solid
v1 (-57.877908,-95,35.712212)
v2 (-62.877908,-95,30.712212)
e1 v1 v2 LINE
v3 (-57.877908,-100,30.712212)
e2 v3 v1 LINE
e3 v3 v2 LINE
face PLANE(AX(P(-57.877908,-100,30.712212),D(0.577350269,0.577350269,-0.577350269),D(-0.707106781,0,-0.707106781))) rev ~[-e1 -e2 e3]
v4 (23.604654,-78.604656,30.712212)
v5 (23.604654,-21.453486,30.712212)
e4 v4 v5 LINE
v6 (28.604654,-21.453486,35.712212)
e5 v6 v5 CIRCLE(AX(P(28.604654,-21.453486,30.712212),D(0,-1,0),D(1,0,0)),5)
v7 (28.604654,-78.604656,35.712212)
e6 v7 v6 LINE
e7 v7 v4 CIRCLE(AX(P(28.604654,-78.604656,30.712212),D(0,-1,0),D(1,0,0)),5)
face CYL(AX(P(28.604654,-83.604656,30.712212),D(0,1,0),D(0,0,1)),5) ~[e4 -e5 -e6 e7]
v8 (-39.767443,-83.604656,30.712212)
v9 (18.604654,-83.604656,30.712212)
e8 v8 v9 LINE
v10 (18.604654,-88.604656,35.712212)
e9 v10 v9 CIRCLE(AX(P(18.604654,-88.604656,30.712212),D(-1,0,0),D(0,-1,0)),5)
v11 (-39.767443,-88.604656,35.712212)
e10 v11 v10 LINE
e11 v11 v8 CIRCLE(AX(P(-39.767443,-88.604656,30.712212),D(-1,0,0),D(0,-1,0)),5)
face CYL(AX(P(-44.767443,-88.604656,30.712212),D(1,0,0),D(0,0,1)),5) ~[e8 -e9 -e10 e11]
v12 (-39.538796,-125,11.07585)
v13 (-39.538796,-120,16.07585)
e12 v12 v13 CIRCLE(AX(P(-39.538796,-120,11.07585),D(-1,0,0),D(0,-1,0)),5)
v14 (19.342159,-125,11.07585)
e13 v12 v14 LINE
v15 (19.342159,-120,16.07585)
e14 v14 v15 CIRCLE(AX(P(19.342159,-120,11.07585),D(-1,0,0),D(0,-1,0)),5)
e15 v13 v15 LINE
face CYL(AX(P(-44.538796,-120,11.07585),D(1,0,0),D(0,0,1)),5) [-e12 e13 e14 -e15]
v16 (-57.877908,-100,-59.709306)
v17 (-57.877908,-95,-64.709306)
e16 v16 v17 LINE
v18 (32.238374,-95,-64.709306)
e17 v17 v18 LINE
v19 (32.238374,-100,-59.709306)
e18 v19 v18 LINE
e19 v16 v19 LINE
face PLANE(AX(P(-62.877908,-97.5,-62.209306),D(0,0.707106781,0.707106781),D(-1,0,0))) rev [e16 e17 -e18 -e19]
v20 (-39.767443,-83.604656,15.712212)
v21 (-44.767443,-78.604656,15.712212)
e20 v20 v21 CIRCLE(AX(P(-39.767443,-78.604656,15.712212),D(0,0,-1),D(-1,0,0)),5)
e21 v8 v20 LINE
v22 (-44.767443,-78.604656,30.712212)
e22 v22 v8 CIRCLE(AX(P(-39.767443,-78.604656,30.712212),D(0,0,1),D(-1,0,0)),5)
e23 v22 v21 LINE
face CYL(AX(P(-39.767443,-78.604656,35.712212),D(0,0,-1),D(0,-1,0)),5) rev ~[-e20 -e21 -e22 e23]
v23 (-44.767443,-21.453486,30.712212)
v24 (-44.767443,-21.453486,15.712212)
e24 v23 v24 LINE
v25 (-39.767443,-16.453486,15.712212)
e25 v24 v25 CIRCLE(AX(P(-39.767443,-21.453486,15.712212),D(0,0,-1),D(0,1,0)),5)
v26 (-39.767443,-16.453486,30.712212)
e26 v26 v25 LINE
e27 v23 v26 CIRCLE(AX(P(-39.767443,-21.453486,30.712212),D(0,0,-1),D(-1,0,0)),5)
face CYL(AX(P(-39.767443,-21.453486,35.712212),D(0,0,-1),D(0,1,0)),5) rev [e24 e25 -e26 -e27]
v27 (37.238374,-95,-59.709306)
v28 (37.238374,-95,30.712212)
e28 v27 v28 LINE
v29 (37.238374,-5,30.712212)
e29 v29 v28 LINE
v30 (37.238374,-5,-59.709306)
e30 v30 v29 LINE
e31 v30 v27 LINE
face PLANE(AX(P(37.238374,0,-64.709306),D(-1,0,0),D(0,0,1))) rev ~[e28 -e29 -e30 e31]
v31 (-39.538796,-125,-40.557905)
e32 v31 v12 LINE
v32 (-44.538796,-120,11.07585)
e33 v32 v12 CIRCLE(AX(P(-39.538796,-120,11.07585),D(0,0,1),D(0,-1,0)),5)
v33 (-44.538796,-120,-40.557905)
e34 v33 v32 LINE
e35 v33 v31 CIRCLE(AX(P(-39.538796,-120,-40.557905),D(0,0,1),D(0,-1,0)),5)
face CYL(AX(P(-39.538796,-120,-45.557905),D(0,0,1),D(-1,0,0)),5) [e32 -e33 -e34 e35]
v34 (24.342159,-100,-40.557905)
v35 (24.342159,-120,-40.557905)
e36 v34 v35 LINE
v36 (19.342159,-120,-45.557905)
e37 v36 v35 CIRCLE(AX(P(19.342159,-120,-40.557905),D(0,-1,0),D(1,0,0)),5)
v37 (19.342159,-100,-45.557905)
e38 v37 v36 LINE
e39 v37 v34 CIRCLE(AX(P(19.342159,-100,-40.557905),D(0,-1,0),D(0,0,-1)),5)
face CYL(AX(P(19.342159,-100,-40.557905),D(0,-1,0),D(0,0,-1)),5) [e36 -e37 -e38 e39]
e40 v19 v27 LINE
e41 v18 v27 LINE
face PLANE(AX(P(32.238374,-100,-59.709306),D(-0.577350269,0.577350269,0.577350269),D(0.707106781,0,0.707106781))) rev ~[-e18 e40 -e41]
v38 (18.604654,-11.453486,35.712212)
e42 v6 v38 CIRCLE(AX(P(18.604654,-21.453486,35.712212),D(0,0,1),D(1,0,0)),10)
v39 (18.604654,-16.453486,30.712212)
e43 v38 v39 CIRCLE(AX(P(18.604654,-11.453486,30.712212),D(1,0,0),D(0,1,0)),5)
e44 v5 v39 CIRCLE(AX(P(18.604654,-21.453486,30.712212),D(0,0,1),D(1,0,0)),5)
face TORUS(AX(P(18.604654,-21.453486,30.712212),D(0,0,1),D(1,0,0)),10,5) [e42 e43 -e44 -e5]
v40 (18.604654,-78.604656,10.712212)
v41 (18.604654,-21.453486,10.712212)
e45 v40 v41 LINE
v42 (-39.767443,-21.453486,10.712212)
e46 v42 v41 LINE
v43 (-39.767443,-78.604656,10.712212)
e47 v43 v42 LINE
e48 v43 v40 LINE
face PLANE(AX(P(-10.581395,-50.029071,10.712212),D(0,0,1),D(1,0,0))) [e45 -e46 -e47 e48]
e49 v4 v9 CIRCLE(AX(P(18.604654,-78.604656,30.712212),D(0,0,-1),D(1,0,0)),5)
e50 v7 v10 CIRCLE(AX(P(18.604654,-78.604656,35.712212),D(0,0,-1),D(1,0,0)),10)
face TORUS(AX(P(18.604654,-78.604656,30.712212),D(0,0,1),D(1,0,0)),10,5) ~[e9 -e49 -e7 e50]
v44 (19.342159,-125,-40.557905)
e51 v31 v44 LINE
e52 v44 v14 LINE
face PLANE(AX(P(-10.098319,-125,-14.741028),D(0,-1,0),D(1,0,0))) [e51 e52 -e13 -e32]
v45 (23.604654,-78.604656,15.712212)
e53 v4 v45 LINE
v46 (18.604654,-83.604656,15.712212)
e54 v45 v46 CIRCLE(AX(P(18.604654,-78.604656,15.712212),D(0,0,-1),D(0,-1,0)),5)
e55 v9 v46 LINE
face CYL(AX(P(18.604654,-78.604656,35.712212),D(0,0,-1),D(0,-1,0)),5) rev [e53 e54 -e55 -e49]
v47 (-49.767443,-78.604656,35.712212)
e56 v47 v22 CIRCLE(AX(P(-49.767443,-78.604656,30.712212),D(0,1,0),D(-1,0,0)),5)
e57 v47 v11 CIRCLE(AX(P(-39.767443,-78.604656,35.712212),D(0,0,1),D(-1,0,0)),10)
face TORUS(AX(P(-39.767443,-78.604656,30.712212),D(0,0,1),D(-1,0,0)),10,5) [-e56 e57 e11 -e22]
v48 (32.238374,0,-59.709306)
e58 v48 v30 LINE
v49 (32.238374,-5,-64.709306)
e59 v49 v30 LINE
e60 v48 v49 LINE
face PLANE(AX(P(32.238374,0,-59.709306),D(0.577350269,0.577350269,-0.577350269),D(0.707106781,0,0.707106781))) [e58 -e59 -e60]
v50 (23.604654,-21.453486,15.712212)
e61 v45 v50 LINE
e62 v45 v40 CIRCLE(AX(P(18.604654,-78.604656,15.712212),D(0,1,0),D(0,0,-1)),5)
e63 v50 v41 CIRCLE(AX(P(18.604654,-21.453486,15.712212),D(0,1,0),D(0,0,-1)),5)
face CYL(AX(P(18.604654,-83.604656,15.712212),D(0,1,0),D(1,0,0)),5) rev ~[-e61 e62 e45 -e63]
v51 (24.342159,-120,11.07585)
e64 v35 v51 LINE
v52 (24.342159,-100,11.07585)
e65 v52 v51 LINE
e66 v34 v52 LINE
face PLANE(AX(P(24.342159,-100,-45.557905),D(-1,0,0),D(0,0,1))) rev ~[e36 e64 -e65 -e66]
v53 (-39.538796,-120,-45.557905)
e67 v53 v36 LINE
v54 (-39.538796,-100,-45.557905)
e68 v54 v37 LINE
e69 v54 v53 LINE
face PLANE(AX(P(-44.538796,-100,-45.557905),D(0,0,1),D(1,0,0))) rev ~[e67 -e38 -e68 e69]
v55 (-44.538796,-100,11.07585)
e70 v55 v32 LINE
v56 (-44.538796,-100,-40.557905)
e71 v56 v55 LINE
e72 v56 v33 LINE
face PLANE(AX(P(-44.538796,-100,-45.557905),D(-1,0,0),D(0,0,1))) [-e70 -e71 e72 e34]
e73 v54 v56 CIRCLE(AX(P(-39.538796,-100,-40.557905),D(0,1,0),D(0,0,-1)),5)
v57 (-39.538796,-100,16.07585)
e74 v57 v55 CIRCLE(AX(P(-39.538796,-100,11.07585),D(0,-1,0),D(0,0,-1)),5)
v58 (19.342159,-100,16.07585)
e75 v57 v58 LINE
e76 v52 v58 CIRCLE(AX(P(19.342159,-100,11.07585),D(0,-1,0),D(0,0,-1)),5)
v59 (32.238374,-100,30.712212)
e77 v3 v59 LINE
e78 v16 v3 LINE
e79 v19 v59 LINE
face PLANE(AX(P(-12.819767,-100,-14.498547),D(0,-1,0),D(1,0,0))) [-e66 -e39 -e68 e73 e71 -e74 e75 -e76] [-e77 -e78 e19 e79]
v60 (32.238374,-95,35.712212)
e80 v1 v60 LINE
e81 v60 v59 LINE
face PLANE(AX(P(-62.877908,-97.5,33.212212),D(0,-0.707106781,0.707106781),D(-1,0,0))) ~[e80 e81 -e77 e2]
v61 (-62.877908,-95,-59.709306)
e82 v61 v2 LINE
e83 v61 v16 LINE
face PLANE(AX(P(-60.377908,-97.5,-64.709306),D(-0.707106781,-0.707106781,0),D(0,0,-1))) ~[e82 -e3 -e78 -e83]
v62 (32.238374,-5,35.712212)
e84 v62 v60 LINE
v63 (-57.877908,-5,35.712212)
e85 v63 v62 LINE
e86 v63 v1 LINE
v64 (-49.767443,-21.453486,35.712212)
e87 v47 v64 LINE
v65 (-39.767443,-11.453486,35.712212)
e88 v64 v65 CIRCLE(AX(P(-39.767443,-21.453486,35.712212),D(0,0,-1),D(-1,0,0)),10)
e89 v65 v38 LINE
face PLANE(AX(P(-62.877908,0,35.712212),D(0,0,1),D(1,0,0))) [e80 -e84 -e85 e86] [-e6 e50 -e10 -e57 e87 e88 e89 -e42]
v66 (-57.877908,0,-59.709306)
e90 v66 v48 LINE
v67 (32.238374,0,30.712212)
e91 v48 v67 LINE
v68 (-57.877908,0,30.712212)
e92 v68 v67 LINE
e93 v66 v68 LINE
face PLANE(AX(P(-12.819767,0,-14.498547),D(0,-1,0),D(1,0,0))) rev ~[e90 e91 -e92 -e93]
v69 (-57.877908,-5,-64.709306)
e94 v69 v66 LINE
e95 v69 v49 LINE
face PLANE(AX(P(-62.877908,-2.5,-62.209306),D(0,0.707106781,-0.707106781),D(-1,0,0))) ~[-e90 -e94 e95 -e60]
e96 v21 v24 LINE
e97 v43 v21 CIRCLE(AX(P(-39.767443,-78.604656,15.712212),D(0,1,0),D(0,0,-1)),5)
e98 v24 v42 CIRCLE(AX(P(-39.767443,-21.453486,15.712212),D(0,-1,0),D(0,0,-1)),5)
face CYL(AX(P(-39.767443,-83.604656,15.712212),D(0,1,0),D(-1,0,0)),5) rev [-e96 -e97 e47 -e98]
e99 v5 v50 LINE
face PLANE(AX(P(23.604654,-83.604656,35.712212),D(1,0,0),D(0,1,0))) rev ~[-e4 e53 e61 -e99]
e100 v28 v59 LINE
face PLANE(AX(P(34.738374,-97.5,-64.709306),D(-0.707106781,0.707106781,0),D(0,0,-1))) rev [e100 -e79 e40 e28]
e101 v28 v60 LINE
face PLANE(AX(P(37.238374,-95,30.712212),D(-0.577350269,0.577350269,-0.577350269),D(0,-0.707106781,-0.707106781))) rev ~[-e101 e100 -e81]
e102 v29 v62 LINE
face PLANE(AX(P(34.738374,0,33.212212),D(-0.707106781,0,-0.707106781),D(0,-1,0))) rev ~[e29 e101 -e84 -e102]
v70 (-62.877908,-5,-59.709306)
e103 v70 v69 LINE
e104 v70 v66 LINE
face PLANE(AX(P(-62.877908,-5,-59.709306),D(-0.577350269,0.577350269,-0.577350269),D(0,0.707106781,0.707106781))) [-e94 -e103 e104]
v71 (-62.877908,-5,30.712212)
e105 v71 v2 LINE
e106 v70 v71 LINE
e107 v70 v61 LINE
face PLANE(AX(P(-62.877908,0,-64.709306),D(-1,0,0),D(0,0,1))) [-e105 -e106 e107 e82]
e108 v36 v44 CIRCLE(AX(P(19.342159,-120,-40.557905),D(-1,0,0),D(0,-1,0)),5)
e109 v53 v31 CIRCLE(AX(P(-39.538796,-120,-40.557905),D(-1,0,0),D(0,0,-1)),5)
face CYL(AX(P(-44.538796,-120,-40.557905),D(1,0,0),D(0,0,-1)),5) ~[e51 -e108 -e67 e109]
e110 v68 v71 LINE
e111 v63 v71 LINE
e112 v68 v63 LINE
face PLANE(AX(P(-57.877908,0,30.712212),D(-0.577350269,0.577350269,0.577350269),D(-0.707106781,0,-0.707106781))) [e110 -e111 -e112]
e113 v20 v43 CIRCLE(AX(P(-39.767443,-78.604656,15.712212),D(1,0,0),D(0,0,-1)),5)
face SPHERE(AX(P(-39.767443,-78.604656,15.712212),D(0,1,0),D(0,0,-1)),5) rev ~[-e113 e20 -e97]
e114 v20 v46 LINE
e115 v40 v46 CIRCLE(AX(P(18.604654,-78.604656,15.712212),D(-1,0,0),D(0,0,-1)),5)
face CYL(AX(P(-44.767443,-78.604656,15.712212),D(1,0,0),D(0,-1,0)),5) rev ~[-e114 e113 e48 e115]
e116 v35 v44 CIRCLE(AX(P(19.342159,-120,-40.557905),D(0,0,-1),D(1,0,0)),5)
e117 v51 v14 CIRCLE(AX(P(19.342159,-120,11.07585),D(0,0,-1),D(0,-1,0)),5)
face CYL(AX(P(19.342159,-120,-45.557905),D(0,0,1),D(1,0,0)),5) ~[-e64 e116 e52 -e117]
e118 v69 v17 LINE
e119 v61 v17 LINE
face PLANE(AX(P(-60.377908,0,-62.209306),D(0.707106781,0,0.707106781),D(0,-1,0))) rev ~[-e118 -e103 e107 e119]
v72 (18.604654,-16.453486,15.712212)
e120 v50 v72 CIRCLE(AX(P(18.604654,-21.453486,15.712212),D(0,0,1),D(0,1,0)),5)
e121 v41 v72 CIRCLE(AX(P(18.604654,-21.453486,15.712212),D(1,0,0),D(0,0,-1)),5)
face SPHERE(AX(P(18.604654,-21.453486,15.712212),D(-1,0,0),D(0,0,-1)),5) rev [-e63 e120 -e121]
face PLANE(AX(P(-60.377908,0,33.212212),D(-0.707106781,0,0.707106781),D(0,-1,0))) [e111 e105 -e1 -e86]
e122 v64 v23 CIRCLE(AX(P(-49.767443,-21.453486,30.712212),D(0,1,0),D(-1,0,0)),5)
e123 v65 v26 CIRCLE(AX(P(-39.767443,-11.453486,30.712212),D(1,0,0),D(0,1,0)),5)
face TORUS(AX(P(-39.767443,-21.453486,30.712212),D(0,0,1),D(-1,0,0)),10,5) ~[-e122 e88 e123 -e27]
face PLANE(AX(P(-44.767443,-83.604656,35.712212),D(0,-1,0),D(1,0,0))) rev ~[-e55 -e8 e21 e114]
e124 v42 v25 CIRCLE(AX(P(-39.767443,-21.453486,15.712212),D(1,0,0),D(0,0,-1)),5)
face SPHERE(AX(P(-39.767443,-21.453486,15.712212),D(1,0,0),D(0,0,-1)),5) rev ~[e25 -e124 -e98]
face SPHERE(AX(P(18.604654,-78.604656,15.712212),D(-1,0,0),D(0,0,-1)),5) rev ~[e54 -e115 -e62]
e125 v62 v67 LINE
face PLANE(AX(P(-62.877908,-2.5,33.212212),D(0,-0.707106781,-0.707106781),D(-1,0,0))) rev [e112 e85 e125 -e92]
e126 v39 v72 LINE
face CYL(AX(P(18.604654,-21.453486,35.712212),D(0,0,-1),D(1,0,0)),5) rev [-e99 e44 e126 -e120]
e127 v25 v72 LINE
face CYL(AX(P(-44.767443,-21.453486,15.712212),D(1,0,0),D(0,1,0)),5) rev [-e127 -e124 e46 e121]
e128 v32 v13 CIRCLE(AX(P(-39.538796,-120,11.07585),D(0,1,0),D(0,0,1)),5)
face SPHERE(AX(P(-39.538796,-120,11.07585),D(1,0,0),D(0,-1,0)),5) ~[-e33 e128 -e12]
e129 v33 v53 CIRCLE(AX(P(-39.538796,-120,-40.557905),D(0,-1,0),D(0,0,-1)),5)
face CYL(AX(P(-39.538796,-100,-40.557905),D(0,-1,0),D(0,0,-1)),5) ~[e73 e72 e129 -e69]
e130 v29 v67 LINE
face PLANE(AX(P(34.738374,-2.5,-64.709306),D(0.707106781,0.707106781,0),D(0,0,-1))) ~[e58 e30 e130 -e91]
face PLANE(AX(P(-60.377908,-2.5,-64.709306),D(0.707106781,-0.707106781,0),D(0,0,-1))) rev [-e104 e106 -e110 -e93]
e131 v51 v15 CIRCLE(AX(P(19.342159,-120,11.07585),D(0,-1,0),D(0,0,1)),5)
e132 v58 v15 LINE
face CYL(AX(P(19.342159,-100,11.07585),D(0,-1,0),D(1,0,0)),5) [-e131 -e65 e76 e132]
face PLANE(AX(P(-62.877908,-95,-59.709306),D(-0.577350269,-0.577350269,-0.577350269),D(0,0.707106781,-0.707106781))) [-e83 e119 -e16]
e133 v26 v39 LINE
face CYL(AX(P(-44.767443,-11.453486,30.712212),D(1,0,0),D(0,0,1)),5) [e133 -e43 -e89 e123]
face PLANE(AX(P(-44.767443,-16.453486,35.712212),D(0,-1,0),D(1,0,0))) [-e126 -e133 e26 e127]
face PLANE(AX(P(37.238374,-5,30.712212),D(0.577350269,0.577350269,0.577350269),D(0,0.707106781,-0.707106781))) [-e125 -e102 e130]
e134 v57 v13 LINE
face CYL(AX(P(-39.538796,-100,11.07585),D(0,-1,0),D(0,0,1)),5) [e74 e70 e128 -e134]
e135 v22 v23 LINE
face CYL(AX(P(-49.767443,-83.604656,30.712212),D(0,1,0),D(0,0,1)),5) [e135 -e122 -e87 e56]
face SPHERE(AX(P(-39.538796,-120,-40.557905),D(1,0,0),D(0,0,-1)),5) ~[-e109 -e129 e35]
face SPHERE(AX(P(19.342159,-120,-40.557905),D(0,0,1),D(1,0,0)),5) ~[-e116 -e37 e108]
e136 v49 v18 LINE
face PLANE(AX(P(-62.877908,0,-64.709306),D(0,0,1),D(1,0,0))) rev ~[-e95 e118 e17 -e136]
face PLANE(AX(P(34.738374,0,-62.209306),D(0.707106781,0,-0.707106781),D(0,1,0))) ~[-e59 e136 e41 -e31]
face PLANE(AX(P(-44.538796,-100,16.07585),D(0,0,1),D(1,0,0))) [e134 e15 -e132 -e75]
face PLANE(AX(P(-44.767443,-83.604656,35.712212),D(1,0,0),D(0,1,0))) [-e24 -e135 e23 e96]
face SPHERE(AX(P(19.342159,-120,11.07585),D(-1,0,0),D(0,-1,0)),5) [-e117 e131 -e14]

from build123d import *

# Parameters (mm, degrees)
F0_W     = 100.1162827015
F0_H     = 100.4215180874
F1_DEPTH = 100
F2_SIZE  = 5
F3_W     = 68.8809547573
F3_H     = 61.6337545216
F4_DEPTH = 25
F5_R     = 5
F6_W     = 68.3720968664
F6_H     = 67.151170224
F7_DEPTH = 25
F8_R     = 5


with BuildPart() as f1:
    # F0 (on Front) → F1 (new body)
    with BuildSketch(Plane.XZ):
        with Locations((-12.8197669983, -14.4985467196)):
            Rectangle(F0_W, F0_H)
    extrude(amount=F1_DEPTH)

    # F2
    f2_edges = [f1.edges().sort_by_distance(p)[0] for p in [
        (37.238374, -50, -64.709306),
        (-62.877908, -50, 35.712212),
        (-12.819767, -100, 35.712212),
        (-12.819767, 0, 35.712212),
        (37.238374, -50, 35.712212),
        (-12.819767, -100, -64.709306),
        (-12.819767, 0, -64.709306),
        (-62.877908, -100, -14.498547),
        (-62.877908, -50, -64.709306),
        (37.238374, -100, -14.498547),
        (-62.877908, 0, -14.498547),
        (37.238374, 0, -14.498547),
    ]]
    chamfer(f2_edges, length=F2_SIZE)

    # F3 (on face) → F4 (join)
    with BuildSketch(Plane.XZ.offset(100)):
        with Locations((-10.0983185694, -14.7410277277)):
            Rectangle(F3_W, F3_H)
    extrude(amount=F4_DEPTH)

    # F5
    f5_edges = [f1.edges().sort_by_distance(p)[0] for p in [
        (-10.098319, -125, 16.07585),
        (24.342159, -125, -14.741028),
        (24.342159, -112.5, 16.07585),
        (24.342159, -112.5, -45.557905),
        (-10.098319, -125, -45.557905),
        (-44.538796, -112.5, -45.557905),
        (-44.538796, -125, -14.741028),
        (-44.538796, -112.5, 16.07585),
    ]]
    fillet(f5_edges, radius=F5_R)

    # F6 (on face) → F7 (cut)
    with BuildSketch(Plane.XY.offset(35.7122123241)):
        with Locations((-10.5813946575, -50.0290710479)):
            Rectangle(F6_W, F6_H)
    extrude(amount=-F7_DEPTH, mode=Mode.SUBTRACT)

    # F8
    f8_edges = [f1.edges().sort_by_distance(p)[0] for p in [
        (-10.581395, -16.453486, 10.712212),
        (-44.767443, -50.029071, 10.712212),
        (-10.581395, -83.604656, 10.712212),
        (23.604654, -50.029071, 10.712212),
        (23.604654, -16.453486, 23.212212),
        (-44.767443, -16.453486, 23.212212),
        (-44.767443, -83.604656, 23.212212),
        (-44.767443, -50.029071, 35.712212),
        (23.604654, -83.604656, 23.212212),
        (23.604654, -50.029071, 35.712212),
        (-10.581395, -83.604656, 35.712212),
        (-10.581395, -16.453486, 35.712212),
    ]]
    fillet(f8_edges, radius=F8_R)


solid = f1.part
